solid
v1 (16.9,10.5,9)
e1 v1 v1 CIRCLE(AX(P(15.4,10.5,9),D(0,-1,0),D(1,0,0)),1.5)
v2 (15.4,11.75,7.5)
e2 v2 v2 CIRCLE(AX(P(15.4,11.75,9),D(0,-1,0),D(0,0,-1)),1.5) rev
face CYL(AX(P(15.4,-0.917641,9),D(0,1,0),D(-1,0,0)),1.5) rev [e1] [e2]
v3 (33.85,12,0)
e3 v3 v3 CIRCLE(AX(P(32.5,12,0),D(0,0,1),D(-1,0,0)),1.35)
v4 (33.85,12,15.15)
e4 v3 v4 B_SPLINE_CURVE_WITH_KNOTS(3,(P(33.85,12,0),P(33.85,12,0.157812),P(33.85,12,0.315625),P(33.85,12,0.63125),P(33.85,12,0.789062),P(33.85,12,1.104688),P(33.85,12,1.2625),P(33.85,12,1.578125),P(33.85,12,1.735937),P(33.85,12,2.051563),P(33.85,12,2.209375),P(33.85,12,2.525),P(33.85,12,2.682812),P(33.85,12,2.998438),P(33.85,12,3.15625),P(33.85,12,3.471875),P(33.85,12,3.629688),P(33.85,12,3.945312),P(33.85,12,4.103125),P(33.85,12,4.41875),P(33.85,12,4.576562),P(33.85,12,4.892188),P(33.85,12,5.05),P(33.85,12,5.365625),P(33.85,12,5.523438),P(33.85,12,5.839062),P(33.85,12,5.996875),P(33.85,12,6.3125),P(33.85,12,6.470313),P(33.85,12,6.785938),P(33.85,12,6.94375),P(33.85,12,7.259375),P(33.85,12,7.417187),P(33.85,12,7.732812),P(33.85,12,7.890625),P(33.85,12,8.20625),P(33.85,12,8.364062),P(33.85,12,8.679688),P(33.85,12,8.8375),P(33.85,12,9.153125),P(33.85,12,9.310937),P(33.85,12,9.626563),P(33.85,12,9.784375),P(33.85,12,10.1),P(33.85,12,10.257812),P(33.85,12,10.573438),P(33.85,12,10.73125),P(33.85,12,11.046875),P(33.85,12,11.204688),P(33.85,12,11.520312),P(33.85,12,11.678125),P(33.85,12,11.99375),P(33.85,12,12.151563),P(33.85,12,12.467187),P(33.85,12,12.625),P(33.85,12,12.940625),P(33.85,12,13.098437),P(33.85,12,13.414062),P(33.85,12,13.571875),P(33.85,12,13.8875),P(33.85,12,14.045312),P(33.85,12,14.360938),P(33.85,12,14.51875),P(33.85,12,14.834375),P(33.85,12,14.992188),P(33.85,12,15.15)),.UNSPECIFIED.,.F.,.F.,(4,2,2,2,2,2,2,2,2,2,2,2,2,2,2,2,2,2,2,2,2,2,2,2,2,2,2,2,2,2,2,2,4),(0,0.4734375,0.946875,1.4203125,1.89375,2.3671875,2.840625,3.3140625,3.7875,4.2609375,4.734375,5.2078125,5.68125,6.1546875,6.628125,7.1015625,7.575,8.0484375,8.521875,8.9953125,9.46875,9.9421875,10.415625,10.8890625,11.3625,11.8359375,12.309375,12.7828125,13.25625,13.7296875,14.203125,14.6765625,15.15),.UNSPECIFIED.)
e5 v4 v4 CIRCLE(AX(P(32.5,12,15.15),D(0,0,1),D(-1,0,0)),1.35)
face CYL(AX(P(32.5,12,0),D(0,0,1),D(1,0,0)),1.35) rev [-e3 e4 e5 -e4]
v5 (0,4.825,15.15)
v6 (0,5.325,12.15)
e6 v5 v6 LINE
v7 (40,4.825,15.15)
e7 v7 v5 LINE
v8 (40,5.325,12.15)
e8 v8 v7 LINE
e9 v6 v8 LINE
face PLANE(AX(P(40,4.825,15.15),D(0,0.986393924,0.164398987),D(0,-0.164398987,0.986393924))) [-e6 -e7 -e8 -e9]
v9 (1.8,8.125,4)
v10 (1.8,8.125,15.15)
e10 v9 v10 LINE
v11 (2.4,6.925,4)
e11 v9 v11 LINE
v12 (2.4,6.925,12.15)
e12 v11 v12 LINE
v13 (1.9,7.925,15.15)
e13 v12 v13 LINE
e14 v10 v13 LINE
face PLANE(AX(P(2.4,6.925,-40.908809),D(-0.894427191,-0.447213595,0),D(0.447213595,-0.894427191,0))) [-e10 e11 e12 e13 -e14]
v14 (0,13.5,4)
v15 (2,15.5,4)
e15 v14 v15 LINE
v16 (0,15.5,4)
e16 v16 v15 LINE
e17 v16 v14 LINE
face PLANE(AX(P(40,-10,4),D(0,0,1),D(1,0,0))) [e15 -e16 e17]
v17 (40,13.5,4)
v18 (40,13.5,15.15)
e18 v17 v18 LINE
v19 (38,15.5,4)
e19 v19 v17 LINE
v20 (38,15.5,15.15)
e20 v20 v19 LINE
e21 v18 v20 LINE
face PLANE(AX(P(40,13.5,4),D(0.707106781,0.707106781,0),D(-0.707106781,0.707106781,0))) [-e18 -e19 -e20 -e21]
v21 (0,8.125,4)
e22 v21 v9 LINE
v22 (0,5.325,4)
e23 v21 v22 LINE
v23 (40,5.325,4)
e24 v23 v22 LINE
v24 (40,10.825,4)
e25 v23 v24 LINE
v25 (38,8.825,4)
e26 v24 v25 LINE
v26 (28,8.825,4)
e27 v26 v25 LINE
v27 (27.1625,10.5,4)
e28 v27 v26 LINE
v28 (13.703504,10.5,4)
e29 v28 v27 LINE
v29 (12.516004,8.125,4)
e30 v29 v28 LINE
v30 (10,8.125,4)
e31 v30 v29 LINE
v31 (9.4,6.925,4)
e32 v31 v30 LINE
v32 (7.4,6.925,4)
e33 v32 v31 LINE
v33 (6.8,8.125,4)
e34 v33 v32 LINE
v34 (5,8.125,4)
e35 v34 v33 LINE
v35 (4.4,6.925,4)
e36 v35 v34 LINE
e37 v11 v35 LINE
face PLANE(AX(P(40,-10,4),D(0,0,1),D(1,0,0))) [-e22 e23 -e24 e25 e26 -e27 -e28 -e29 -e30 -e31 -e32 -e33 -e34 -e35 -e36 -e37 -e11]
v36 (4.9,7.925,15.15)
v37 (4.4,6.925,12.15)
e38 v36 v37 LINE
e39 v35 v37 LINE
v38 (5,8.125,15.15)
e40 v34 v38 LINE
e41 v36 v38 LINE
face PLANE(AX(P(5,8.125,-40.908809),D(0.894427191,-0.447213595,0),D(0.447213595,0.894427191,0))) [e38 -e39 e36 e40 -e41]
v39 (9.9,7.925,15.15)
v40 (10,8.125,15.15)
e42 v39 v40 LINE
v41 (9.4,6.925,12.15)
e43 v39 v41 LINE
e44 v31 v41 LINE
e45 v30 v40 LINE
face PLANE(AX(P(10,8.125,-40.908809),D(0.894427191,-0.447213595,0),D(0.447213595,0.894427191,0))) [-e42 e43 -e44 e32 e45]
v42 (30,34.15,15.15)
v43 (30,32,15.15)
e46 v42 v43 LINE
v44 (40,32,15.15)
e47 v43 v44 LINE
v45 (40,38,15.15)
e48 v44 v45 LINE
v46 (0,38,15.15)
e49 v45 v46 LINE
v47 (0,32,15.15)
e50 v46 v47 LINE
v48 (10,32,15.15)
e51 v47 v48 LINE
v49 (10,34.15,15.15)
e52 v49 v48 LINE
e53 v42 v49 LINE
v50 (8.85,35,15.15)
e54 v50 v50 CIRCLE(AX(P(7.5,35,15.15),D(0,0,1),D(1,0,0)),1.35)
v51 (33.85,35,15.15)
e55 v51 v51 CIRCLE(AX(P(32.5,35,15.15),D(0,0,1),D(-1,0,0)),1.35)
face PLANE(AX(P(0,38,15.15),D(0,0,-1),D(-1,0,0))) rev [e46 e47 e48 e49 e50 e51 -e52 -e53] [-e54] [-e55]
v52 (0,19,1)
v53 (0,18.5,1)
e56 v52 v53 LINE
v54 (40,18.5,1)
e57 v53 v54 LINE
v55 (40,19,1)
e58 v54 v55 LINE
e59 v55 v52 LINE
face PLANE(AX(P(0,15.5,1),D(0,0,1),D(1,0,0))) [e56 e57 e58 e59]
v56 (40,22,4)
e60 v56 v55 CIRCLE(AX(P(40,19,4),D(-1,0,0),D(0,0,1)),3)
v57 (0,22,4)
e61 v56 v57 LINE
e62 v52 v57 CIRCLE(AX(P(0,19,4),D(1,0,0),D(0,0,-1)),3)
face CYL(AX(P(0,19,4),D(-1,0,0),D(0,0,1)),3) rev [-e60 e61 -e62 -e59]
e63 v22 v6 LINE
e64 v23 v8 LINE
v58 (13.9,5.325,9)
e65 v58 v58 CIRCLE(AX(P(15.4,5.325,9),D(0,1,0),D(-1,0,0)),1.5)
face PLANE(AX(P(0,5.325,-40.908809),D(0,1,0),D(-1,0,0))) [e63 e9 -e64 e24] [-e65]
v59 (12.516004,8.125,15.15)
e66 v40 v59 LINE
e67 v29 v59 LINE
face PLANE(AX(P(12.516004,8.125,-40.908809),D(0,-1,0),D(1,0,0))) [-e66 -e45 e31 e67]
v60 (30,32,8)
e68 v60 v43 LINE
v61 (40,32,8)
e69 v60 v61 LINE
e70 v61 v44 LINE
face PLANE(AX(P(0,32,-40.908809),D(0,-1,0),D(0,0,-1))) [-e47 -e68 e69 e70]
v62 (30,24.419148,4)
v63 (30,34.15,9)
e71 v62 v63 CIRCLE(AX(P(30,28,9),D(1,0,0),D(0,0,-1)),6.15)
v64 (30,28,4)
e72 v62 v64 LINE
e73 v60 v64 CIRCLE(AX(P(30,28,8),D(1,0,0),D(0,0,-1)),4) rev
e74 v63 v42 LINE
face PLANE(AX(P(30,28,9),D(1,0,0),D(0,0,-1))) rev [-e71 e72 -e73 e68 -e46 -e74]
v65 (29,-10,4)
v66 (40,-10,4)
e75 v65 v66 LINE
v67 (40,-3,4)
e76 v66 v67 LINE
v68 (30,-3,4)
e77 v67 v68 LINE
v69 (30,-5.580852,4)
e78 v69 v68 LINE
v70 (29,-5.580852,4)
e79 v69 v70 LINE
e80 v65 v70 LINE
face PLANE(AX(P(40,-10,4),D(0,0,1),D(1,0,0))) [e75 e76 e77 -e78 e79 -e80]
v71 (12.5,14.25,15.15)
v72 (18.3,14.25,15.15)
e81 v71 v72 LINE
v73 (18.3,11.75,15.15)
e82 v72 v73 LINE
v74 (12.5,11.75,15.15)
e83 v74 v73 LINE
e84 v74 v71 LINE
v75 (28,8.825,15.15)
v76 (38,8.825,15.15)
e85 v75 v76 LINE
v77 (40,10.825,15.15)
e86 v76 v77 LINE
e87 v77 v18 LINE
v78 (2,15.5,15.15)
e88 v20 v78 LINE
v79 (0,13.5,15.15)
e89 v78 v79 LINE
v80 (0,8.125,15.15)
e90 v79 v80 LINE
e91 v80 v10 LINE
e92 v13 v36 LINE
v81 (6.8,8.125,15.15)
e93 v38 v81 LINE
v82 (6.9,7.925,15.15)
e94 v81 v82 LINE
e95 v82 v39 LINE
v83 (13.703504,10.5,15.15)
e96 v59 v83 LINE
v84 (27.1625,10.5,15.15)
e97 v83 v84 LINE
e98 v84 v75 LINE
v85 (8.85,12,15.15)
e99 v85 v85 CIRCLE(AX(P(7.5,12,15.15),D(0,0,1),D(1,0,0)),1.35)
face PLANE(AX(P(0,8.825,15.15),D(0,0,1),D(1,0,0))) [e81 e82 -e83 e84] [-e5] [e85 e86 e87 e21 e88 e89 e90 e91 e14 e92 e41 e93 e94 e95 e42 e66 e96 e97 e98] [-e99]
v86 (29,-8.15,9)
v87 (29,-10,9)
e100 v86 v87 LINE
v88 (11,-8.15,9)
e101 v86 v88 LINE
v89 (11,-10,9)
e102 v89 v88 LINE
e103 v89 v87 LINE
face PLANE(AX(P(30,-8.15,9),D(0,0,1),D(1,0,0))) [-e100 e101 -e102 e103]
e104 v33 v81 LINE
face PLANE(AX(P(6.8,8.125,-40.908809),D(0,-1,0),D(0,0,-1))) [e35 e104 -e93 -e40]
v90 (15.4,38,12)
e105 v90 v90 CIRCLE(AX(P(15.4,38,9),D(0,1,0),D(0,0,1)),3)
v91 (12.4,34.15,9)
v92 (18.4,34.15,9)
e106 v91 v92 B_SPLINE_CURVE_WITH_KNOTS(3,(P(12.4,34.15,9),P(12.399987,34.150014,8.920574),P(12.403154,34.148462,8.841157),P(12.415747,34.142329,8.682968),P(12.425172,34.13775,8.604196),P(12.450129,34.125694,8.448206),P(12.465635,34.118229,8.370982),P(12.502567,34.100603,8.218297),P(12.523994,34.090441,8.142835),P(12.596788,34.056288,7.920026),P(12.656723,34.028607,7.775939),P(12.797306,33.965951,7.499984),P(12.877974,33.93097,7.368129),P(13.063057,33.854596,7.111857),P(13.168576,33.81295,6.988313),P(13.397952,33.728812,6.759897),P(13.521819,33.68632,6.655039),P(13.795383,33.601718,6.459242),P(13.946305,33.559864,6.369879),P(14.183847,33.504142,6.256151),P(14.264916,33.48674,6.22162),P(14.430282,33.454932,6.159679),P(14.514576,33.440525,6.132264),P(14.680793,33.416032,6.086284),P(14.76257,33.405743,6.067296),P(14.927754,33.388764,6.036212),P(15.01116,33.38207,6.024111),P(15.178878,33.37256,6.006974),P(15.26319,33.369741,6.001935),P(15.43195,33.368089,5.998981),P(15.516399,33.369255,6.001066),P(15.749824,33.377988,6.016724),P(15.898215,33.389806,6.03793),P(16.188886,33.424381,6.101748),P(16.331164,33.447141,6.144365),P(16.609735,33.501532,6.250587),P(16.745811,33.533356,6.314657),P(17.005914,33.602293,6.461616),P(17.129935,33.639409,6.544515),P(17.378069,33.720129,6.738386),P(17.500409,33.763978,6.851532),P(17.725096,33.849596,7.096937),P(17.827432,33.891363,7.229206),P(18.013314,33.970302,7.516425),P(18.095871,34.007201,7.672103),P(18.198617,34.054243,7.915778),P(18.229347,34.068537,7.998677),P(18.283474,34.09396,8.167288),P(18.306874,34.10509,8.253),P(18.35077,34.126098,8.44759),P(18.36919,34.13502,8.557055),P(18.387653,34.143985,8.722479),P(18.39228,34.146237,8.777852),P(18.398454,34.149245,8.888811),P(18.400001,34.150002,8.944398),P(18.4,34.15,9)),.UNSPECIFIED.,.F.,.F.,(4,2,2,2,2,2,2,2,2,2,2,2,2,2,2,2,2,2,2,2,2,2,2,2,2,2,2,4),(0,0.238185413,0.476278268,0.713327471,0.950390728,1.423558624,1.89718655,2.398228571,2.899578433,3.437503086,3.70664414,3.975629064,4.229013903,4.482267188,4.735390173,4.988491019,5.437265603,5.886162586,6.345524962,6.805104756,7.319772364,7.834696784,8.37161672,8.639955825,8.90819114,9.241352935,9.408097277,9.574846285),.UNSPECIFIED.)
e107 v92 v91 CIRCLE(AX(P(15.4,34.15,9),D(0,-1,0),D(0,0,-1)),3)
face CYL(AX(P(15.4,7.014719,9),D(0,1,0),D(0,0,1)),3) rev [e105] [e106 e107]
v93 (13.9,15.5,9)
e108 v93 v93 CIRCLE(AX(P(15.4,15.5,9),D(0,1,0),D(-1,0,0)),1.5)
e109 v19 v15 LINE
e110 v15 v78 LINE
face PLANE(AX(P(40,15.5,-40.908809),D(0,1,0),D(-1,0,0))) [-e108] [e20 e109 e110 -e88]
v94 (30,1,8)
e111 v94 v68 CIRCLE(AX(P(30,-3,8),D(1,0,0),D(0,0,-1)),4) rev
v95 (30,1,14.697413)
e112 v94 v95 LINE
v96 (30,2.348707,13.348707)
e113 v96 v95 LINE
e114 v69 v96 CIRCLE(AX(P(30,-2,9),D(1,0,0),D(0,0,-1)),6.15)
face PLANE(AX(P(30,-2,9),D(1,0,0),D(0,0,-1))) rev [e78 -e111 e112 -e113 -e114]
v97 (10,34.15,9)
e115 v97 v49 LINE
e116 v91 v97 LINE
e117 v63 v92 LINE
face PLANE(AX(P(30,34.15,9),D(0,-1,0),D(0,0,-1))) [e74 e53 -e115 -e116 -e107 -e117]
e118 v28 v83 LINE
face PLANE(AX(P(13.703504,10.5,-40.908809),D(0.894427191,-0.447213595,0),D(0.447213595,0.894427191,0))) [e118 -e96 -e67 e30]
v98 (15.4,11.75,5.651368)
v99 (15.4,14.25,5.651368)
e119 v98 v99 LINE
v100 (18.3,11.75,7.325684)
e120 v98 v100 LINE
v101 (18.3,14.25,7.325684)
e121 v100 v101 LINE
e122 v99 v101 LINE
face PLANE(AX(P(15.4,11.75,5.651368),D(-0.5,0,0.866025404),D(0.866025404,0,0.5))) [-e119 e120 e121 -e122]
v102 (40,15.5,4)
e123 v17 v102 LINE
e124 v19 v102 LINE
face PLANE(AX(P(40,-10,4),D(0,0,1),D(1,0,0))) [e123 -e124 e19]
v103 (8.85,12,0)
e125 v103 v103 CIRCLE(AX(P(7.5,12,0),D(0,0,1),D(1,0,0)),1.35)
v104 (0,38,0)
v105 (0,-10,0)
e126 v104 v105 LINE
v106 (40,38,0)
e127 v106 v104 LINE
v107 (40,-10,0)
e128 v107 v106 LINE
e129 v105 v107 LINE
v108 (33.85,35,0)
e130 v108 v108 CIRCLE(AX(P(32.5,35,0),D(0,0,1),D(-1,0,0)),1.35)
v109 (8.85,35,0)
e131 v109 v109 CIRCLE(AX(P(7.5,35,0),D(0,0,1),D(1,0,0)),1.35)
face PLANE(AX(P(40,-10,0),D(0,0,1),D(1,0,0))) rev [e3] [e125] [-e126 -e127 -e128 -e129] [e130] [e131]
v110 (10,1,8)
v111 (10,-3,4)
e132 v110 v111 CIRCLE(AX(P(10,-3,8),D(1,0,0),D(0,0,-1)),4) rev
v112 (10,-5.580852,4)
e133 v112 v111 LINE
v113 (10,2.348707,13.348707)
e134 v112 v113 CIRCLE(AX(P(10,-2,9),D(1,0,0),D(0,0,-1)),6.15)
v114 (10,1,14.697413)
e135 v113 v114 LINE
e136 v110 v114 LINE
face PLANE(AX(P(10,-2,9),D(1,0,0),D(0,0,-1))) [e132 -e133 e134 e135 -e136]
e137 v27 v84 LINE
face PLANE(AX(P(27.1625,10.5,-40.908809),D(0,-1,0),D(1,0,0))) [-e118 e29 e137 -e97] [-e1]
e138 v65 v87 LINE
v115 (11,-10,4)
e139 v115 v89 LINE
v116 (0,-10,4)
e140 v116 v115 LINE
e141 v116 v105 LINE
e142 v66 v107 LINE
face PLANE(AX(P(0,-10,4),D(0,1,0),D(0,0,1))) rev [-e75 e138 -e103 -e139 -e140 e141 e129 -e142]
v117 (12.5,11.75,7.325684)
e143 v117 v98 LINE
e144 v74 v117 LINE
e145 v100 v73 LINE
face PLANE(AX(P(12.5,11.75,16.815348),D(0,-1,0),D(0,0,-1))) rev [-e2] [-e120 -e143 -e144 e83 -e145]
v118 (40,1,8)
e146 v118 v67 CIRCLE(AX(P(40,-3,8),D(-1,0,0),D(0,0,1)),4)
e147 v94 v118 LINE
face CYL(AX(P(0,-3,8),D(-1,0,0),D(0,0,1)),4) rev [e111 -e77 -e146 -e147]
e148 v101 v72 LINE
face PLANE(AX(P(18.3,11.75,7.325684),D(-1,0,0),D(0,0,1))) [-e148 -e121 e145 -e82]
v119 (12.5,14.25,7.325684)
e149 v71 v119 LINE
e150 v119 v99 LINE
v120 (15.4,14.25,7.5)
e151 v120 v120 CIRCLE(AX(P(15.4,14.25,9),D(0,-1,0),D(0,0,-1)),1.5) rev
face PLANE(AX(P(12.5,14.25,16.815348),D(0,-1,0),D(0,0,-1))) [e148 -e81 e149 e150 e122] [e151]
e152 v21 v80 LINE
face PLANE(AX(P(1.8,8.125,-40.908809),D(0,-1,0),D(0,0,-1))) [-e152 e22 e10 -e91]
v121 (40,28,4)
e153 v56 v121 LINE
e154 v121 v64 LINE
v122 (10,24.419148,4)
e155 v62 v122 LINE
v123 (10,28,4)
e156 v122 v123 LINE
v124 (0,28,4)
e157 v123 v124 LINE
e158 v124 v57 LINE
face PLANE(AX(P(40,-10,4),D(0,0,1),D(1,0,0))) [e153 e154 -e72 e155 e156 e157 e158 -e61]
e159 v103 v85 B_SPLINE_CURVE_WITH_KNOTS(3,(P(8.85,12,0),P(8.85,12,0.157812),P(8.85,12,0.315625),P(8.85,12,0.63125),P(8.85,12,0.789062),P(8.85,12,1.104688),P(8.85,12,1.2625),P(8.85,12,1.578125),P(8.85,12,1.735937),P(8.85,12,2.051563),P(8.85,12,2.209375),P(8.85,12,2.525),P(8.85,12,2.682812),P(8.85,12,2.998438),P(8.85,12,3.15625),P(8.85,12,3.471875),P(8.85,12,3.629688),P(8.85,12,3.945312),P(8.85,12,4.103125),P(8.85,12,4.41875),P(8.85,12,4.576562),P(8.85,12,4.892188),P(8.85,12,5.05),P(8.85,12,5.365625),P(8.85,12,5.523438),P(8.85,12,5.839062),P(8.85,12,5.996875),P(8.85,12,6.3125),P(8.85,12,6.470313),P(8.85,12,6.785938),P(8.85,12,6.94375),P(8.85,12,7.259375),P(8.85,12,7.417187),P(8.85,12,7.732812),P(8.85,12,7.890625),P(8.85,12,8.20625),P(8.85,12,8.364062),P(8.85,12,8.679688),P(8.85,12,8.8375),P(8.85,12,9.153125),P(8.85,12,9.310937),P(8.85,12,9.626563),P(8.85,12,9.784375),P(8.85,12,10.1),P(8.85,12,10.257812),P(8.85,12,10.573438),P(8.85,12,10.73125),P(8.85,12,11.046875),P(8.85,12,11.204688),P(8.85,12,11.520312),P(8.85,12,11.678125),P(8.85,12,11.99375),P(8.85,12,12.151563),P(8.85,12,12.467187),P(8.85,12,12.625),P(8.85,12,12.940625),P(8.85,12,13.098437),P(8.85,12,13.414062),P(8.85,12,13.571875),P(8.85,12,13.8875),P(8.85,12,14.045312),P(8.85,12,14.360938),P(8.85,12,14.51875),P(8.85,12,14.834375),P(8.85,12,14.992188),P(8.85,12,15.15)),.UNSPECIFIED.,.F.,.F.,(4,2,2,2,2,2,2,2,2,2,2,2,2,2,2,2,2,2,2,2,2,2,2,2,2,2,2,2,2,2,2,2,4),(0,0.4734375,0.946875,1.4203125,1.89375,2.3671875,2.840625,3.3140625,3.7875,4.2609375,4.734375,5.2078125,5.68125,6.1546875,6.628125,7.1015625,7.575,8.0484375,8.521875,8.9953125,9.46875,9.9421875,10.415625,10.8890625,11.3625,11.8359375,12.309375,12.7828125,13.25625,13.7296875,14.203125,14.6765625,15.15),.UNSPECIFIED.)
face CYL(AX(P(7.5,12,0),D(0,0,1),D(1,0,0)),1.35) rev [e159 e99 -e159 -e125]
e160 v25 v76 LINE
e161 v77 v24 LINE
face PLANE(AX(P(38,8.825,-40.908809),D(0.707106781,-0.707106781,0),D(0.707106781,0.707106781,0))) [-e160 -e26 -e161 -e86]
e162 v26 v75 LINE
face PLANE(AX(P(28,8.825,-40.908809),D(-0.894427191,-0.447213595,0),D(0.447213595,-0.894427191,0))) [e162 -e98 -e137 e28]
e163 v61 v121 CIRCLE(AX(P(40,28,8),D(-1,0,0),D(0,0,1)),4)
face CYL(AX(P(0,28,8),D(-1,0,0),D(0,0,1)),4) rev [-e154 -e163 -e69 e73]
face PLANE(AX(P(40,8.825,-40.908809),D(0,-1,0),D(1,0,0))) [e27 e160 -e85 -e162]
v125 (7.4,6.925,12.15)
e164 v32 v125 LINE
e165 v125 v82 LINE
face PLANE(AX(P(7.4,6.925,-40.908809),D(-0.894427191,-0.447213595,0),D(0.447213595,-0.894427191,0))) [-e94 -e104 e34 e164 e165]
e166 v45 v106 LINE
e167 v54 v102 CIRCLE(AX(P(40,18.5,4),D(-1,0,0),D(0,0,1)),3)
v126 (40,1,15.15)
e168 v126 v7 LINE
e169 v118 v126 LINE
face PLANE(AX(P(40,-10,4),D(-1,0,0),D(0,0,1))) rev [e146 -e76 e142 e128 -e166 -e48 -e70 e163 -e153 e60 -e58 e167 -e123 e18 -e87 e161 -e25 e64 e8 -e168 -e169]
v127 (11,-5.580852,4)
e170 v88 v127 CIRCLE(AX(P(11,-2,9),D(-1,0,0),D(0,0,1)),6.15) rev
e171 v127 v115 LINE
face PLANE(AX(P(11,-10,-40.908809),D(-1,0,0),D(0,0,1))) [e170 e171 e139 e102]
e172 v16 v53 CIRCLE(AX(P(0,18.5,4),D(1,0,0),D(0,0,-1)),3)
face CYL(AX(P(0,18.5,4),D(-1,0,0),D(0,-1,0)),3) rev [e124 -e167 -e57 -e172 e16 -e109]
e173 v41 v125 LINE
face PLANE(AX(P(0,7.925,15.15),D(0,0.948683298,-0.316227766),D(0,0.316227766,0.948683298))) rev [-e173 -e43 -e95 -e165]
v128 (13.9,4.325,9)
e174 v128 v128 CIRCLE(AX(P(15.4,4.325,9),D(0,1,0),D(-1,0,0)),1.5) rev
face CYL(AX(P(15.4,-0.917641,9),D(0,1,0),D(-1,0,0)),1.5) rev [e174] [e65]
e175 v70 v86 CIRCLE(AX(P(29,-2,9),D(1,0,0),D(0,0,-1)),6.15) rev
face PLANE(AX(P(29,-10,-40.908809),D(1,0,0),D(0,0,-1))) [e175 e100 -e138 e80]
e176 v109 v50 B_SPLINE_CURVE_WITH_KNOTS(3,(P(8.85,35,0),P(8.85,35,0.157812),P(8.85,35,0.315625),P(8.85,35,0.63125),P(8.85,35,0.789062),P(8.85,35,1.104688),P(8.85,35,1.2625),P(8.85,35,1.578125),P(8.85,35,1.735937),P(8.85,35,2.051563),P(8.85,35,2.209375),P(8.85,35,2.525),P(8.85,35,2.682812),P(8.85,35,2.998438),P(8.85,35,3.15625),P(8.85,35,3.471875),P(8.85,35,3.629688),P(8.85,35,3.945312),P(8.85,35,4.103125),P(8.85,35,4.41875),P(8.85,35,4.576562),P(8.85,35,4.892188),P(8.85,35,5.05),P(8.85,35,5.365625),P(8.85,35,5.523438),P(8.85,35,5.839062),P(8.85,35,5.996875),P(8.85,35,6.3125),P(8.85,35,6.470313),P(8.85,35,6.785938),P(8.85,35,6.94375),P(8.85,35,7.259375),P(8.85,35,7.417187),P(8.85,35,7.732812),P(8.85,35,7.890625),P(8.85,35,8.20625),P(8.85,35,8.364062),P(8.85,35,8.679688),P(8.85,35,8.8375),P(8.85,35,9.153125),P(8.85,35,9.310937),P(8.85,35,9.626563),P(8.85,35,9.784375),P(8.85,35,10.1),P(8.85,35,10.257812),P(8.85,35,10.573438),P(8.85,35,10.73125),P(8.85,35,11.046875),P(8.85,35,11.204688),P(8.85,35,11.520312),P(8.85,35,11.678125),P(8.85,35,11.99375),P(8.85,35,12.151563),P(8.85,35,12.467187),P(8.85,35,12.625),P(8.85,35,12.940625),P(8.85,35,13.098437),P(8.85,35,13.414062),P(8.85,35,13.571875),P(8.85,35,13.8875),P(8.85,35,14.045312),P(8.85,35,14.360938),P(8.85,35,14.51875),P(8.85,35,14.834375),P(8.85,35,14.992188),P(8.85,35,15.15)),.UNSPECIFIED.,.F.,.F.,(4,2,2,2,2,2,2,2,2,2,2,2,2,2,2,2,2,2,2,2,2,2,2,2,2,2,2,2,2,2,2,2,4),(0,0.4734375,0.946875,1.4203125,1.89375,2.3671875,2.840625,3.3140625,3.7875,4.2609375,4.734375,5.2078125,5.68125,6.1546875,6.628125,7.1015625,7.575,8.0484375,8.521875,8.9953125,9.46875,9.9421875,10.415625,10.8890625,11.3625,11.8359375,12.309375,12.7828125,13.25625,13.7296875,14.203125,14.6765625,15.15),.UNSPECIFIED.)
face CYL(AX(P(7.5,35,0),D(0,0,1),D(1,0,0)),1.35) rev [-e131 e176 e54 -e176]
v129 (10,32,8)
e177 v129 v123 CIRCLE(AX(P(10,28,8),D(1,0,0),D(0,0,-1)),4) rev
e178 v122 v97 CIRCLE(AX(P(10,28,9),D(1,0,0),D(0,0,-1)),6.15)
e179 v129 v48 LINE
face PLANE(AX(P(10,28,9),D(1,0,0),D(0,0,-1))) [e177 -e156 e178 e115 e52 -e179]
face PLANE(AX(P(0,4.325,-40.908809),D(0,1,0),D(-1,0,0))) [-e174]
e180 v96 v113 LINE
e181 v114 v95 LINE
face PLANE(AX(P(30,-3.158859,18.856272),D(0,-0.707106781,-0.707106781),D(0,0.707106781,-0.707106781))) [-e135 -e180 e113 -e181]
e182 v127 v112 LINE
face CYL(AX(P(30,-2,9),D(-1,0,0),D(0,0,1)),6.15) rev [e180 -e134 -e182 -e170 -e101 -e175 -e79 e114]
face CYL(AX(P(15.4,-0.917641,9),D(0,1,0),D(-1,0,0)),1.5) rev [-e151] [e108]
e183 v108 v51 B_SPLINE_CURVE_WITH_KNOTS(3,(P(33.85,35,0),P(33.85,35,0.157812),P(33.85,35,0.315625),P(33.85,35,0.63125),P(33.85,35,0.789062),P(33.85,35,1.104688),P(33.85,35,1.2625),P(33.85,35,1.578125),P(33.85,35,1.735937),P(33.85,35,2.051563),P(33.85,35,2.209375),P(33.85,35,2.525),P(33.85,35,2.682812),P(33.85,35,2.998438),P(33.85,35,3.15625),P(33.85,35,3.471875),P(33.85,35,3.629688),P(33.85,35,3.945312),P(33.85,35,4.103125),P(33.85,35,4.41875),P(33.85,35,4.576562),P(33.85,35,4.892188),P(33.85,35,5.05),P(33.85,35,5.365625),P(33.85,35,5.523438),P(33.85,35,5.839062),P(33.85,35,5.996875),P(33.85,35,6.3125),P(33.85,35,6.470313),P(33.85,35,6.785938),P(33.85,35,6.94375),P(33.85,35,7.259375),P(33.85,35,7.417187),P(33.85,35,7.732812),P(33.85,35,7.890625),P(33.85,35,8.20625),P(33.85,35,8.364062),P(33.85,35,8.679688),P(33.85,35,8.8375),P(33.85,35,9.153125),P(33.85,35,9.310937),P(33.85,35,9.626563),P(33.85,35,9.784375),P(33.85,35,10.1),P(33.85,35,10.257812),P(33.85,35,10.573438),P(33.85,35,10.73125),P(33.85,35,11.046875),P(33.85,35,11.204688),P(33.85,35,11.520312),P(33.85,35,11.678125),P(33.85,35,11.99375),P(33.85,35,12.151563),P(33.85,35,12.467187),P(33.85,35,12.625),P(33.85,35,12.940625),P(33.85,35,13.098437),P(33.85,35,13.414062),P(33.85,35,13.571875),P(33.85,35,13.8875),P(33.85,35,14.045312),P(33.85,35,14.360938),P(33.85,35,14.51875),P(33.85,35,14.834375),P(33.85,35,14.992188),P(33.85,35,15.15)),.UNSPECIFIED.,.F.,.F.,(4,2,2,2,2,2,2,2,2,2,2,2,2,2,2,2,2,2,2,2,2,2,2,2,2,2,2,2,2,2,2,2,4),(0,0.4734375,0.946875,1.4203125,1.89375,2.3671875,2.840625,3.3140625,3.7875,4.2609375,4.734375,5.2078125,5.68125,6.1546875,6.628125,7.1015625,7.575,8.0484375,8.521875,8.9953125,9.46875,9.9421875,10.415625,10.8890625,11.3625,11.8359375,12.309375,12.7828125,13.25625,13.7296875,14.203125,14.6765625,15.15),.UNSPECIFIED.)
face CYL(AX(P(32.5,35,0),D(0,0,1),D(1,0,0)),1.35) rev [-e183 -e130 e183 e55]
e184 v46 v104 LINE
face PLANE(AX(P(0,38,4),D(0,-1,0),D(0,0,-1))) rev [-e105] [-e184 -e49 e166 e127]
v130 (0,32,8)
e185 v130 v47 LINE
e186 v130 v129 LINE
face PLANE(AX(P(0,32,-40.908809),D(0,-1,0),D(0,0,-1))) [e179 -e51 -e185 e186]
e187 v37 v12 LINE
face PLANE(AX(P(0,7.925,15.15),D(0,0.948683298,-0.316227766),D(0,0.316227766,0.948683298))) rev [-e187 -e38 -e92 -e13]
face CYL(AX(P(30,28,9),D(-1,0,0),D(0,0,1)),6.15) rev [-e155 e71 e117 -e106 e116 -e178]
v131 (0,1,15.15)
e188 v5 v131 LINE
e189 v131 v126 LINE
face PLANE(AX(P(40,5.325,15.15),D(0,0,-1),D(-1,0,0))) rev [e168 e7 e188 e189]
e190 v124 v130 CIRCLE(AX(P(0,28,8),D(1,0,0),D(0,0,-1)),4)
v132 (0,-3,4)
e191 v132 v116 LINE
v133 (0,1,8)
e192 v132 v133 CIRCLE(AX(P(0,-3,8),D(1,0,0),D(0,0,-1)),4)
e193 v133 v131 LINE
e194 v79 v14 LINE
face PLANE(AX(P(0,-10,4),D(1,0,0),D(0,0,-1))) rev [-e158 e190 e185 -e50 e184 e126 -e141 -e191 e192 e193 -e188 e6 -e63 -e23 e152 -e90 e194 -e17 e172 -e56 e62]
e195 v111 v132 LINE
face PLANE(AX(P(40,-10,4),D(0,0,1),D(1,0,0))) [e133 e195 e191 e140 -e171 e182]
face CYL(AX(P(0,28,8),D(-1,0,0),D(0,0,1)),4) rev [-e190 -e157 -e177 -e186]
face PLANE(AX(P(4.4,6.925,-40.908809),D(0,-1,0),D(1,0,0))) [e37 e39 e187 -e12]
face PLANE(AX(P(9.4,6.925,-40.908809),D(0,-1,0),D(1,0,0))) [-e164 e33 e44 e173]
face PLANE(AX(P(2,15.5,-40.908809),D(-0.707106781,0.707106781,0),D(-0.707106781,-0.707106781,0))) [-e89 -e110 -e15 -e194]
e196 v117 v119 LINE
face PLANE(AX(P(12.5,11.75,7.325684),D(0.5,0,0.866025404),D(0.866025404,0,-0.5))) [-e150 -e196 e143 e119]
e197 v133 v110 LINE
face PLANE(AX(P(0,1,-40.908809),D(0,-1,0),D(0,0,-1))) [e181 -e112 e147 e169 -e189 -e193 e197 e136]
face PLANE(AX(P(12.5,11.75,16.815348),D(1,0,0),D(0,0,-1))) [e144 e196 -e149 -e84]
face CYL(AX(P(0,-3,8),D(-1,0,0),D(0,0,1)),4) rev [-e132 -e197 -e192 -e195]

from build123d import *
from OCP.BRepFilletAPI import BRepFilletAPI_MakeChamfer

# Parameters (mm, degrees)
SKETCH1_W                = 40
SKETCH1_H                = 48
BOSS_EXTRUDE1_DEPTH      = 4
BOSS_EXTRUDE2_DEPTH      = 11.15
BOSS_EXTRUDE2_DEPTH_BACK = 4
SKETCH5_W                = 40
SKETCH5_H                = 4.325
SKETCH5_W_2              = 18
SKETCH5_H_2              = 5
SKETCH5_H_3              = 6
FILLET1_R                = 4
SKETCH6_R                = 1.35
CUT_EXTRUDE4_DEPTH       = 58.214705278
CHAMFER2_SIZE            = 2
SKETCH7_W                = 40
SKETCH7_H                = 6.5
CUT_EXTRUDE5_DEPTH       = 3
FILLET2_R                = 3
CHAMFER3_SIZE            = 3
CHAMFER3_SIZE2           = 1
CHAMFER4_SIZE            = 3
CHAMFER4_SIZE2           = 0.5
CUT_EXTRUDE6_DEPTH       = 10
CUT_EXTRUDE6_DEPTH_BACK  = 10
CUT_EXTRUDE8_REACH       = 66.292
SKETCH12_R               = 3
SKETCH13_R               = 1.5
CUT_EXTRUDE10_DEPTH      = 11.175
CUT_EXTRUDE7_DEPTH       = 1.25
CUT_EXTRUDE7_DEPTH_BACK  = 1.25


with BuildPart() as part:
    # Sketch1 → Boss-Extrude1 (new body)
    with BuildSketch(Plane.XY):
        with Locations((20, 14)):
            Rectangle(SKETCH1_W, SKETCH1_H)
    extrude(amount=BOSS_EXTRUDE1_DEPTH)

    # Sketch5 → Boss-Extrude2 (add, two sides: drawn at the far end of the back side and taken through both)
    with BuildSketch(Plane.XY.offset(4).offset(-BOSS_EXTRUDE2_DEPTH_BACK)):
        Polygon((1.8, 8.125), (0, 8.125), (0, 15.5), (40, 15.5), (40, 8.825), (28, 8.825), (27.1625, 10.5), (13.70350416, 10.5), (12.51600416, 8.125), (10, 8.125), (9.4, 6.925), (7.4, 6.925), (6.8, 8.125), (5, 8.125), (4.4, 6.925), (2.4, 6.925), align=None)
        with Locations((20, 3.1625)):
            Rectangle(SKETCH5_W, SKETCH5_H)
        with Locations((20, -7.5)):
            Rectangle(SKETCH5_W_2, SKETCH5_H_2)
        with Locations((20, 35)):
            Rectangle(SKETCH5_W, SKETCH5_H_3)
    extrude(amount=BOSS_EXTRUDE2_DEPTH + BOSS_EXTRUDE2_DEPTH_BACK)

    # Fillet1
    fillet1_edges = [part.edges().sort_by_distance(p)[0] for p in [
        (20, 32, 4),
        (20, 1, 4),
    ]]
    fillet(fillet1_edges, radius=FILLET1_R)

    # Sketch6 → Cut-Extrude4 (cut, through all)
    with BuildSketch(Plane.XY.offset(15.15)):
        with Locations((7.5, 35)):
            Circle(SKETCH6_R)
        with Locations((7.5, 12)):
            Circle(SKETCH6_R)
        with Locations((32.5, 35)):
            Circle(SKETCH6_R)
        with Locations((32.5, 12)):
            Circle(SKETCH6_R)
    extrude(amount=-CUT_EXTRUDE4_DEPTH, mode=Mode.SUBTRACT)

    # Chamfer2
    chamfer2_edges = [part.edges().sort_by_distance(p)[0] for p in [
        (40, 8.825, 9.575),
        (0, 15.5, 9.575),
        (40, 15.5, 9.575),
    ]]
    chamfer(chamfer2_edges, length=CHAMFER2_SIZE)

    # Sketch7 → Cut-Extrude5 (cut)
    with BuildSketch(Plane.XY.offset(4)):
        with Locations((20, 18.75)):
            Rectangle(SKETCH7_W, SKETCH7_H)
    extrude(amount=-CUT_EXTRUDE5_DEPTH, mode=Mode.SUBTRACT)

    # Fillet2
    fillet2_edges = [part.edges().sort_by_distance(p)[0] for p in [
        (20, 15.5, 1),
        (20, 22, 1),
    ]]
    fillet(fillet2_edges, radius=FILLET2_R - 0.0001)  # a hair under: the kernel refuses the full size

    # Chamfer3: one chamfer whose edges measure the first distance from different faces: ONE call of the kernel's chamfer builder (chamfer() names one face for all edges)
    chamfer3_edges_1 = [part.edges().sort_by_distance(p)[0] for p in [
        (3.4, 6.925, 15.15),
    ]]
    chamfer3_side_1 = [part.faces().sort_by_distance(p)[0] for p in [
        (3.4, 6.925, 9.575),
    ]]
    chamfer3_edges_2 = [part.edges().sort_by_distance(p)[0] for p in [
        (8.4, 6.925, 15.15),
    ]]
    chamfer3_side_2 = [part.faces().sort_by_distance(p)[0] for p in [
        (8.4, 6.925, 9.575),
    ]]
    chamfer3 = BRepFilletAPI_MakeChamfer(part.part.solid().wrapped)
    for e in chamfer3_edges_1:
        chamfer3.Add(CHAMFER3_SIZE, CHAMFER3_SIZE2, e.wrapped, chamfer3_side_1[0].wrapped)  # the first distance lies on this face
    for e in chamfer3_edges_2:
        chamfer3.Add(CHAMFER3_SIZE, CHAMFER3_SIZE2, e.wrapped, chamfer3_side_2[0].wrapped)  # the first distance lies on this face
    add(Compound.cast(chamfer3.Shape()), mode=Mode.REPLACE)

    # Chamfer4
    chamfer4_edges = [part.edges().sort_by_distance(p)[0] for p in [
        (20, 5.325, 15.15),
    ]]
    chamfer4_side = [part.faces().sort_by_distance(p)[0] for p in [
        (20, 5.325, 9.575),
    ]]
    chamfer(chamfer4_edges, length=CHAMFER4_SIZE, length2=CHAMFER4_SIZE2, reference=chamfer4_side[0])

    # Sketch8 → Cut-Extrude6 (cut, two sides: drawn at the far end of the back side and taken through both)
    with BuildSketch(Plane(origin=(20, 0, 0), x_dir=(0, 0, -1), z_dir=(1, 0, 0)).offset(-CUT_EXTRUDE6_DEPTH_BACK)):
        with BuildLine():
            Line((-9, 34.15), (-18.856272107, 34.15))
            Line((-18.856272107, 34.15), (-18.856272107, 21.85))
            Line((-18.856272107, 21.85), (-9, 21.85))
            ThreePointArc((-9, 21.85), (-2.85, 28), (-9, 34.15))
        make_face()
        with BuildLine():
            Line((-18.856272107, -10.437196649), (-18.856272107, -3.158858698))
            Line((-18.856272107, -3.158858698), (-13.348706704, 2.348706704))
            ThreePointArc((-13.348706704, 2.348706704), (-3.318140875, 0.353503109), (-9, -8.15))
            Line((-9, -8.15), (-9, -10.437196649))
            Line((-9, -10.437196649), (-18.856272107, -10.437196649))
        make_face()
    extrude(amount=CUT_EXTRUDE6_DEPTH + CUT_EXTRUDE6_DEPTH_BACK, mode=Mode.SUBTRACT)

    # Cut-Extrude8: up to this face of the body (flat: up to its plane)
    cut_extrude8_end = Plane(part.part.faces().sort_by_distance((20, 15.5, 9.574944444))[0])
    # Sketch12 → Cut-Extrude8 (cut, up to the picked face)
    with BuildSketch(Plane(origin=(0, 38, 0), x_dir=(1, 0, 0), z_dir=(0, 1, 0)), mode=Mode.PRIVATE) as cut_extrude8_sk1:
        with Locations(Location((15.4, -9, 0), (0, 0, 270))):
            Circle(SKETCH12_R)
    cut_extrude8_tool1 = split(extrude(cut_extrude8_sk1.sketch, amount=-CUT_EXTRUDE8_REACH, mode=Mode.PRIVATE), bisect_by=cut_extrude8_end, keep=Keep.BOTH, mode=Mode.PRIVATE)
    add(cut_extrude8_tool1.solids().sort_by(Axis((15.4, 38, 9), (0, -1, 0)))[0], mode=Mode.SUBTRACT)

    # Sketch13 → Cut-Extrude10 (cut)
    with BuildSketch(Plane(origin=(0, 15.5, 0), x_dir=(1, 0, 0), z_dir=(0, 1, 0))):
        with Locations(Location((15.4, -9, 0), (0, 0, 180))):
            Circle(SKETCH13_R)
    extrude(amount=-CUT_EXTRUDE10_DEPTH, mode=Mode.SUBTRACT)

    # Sketch9 → Cut-Extrude7 (cut, two sides: drawn at the far end of the back side and taken through both)
    with BuildSketch(Plane.XZ.offset(-13).offset(-CUT_EXTRUDE7_DEPTH_BACK)):
        Polygon((12.5, 16.815347994), (18.3, 16.815347994), (18.3, 7.325684219), (15.4, 5.651368439), (12.5, 7.325684219), align=None)
    extrude(amount=CUT_EXTRUDE7_DEPTH + CUT_EXTRUDE7_DEPTH_BACK, mode=Mode.SUBTRACT)


solid = part.part
